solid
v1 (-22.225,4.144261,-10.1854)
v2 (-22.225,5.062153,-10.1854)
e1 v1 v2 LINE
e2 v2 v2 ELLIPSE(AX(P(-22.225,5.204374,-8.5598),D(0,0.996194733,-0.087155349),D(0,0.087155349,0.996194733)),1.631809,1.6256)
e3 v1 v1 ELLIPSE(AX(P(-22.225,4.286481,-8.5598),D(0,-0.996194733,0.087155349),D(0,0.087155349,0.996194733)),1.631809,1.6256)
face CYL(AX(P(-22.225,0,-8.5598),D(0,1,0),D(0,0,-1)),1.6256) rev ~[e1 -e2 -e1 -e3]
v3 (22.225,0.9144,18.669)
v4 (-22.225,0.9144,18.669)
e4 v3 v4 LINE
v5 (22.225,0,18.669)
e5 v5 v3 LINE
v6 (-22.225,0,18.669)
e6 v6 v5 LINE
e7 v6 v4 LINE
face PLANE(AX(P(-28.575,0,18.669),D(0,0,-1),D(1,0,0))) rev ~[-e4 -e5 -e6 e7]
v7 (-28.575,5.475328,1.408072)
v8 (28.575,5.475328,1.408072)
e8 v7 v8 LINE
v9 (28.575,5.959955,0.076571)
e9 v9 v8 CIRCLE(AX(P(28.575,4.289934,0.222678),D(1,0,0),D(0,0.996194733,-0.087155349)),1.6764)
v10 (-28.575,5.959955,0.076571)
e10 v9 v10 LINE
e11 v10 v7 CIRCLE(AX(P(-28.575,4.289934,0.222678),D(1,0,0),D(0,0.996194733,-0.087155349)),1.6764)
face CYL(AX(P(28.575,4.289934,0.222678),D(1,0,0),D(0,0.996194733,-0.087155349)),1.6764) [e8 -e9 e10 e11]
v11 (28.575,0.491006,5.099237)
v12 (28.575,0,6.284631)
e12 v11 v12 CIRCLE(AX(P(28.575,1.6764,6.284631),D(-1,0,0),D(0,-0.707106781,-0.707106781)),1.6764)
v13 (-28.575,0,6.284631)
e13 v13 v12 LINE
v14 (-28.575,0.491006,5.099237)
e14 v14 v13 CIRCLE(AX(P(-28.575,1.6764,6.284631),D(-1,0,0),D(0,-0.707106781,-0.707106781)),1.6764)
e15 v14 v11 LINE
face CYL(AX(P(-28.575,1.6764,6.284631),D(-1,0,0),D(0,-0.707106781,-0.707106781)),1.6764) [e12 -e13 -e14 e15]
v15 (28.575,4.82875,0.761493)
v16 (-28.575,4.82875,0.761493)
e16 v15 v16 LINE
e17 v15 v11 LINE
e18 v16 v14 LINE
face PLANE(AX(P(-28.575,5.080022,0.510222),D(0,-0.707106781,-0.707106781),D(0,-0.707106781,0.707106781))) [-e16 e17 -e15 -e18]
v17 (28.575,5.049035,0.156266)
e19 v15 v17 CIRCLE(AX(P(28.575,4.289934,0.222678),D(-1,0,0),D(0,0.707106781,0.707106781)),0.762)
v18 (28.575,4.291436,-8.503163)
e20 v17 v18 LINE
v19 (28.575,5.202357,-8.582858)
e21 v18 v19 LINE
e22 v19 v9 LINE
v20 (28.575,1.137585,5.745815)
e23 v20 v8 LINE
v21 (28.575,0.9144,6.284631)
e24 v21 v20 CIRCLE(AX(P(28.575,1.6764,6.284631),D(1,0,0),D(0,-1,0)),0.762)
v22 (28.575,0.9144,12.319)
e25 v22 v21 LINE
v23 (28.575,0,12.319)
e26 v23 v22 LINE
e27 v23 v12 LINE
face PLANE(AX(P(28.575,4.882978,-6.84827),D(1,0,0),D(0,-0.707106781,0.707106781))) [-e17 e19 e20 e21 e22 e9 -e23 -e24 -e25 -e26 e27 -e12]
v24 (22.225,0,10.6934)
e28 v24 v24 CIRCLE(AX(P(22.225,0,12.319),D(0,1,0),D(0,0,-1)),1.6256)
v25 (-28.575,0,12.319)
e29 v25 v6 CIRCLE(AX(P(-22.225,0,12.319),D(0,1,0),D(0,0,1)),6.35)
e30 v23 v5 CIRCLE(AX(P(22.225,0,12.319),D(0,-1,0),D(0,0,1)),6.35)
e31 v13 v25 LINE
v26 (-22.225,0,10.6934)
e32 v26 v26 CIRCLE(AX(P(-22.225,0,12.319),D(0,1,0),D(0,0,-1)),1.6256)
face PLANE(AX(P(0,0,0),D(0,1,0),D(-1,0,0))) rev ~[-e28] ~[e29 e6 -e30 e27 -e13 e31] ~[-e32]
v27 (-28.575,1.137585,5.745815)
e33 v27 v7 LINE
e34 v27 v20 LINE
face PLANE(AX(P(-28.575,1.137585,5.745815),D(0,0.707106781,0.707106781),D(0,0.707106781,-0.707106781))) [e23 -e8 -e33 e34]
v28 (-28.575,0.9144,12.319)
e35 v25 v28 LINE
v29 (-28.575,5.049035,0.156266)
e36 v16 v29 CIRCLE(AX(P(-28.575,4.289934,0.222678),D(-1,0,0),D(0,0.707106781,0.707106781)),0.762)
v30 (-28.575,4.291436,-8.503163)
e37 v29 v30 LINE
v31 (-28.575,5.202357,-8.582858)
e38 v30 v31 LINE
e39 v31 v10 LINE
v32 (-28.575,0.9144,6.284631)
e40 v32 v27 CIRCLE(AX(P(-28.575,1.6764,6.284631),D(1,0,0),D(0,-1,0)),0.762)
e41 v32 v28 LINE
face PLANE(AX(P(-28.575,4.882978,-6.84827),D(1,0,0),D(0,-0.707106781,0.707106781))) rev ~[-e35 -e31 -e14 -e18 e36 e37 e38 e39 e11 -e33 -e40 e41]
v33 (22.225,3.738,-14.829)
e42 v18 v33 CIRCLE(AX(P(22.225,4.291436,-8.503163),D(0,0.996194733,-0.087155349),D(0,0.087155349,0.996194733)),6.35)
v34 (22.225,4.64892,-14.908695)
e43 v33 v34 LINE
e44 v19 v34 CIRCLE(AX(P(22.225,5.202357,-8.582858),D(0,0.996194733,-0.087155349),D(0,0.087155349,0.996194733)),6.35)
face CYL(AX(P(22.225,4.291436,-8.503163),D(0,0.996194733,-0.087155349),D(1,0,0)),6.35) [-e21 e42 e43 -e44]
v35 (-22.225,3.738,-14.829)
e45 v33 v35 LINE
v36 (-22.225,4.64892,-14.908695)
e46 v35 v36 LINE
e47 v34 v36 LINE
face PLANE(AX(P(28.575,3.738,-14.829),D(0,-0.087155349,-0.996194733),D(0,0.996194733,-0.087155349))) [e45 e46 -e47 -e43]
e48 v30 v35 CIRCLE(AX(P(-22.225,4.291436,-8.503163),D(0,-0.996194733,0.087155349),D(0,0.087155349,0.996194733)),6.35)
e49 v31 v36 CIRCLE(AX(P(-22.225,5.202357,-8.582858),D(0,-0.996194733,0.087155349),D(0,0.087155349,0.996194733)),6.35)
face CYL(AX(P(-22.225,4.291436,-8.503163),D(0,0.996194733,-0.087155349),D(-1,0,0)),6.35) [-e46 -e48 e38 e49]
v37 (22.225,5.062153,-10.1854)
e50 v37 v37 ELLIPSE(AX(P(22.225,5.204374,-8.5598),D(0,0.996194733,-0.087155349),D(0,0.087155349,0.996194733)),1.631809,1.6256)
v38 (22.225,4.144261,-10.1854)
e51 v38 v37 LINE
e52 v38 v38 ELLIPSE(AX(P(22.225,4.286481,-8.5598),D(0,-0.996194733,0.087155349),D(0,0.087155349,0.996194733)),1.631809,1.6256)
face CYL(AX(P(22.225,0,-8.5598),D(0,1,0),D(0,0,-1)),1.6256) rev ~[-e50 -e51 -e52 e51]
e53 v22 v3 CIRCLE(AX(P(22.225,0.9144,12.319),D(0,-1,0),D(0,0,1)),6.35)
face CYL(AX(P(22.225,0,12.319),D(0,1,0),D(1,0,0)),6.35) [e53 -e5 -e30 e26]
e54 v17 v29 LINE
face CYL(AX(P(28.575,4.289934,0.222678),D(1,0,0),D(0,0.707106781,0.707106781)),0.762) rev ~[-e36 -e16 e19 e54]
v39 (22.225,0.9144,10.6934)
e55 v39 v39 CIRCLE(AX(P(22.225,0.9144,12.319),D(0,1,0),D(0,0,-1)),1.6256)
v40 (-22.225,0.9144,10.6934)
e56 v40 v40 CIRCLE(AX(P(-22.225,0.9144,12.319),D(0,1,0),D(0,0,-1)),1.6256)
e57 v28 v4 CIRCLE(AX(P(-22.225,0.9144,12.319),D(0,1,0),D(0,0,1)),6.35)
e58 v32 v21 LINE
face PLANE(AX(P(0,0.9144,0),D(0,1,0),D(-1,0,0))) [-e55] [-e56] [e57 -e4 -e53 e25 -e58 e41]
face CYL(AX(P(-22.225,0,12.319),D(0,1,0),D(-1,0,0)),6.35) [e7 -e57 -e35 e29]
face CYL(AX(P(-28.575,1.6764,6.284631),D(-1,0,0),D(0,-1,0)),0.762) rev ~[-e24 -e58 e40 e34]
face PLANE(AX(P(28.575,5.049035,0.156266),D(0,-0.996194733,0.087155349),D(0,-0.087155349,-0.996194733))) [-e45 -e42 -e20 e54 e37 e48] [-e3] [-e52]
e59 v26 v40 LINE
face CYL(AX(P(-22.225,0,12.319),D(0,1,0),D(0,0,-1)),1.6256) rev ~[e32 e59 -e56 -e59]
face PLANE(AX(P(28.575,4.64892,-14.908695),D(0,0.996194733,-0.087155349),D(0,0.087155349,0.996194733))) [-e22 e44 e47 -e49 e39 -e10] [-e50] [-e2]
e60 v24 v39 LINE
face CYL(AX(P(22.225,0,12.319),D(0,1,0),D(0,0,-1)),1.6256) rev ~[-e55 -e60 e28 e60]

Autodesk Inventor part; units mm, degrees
ref_plane "YZ Plane" through (0, 0, 0) normal (1, 0, 0) x (0, 1, 0)
ref_plane "XZ Plane" through (0, 0, 0) normal (0, 1, 0) x (-1, 0, 0)
ref_plane "XY Plane" through (0, 0, 0) normal (0, 0, 1) x (1, 0, 0)
sketch "Sketch4" plane through (0, 0, 0) normal (0, 1, 0) x (1, 0, 0)
  line L0 (22.225, -12.319) -> (-22.225, -12.319) construction
  line L1 (0, 12.7356) -> (0, -16.4948) construction
  point P0 (0, 0)
  point P1 (22.225, 8.5598)
  point P2 (-22.225, 8.5598)
  dimension "d23" = 44.45
  dimension "d25" = 20.8788
  dimension "d26" = 12.319
sketch "Sketch1" plane through (0, 0, 0) normal (0, 1, 0) x (-1, 0, 0)
  line L0 (28.575, 18.669) -> (-28.575, 18.669)
  line L1 (-28.575, 18.669) -> (-28.575, 5.969)
  line L2 (-28.575, 5.969) -> (28.575, 5.969)
  line L3 (28.575, 5.969) -> (28.575, 18.669)
  line L4 (28.575, 18.669) -> (-28.575, 5.969) construction
  line L5 (-28.575, 18.669) -> (28.575, 5.969) construction
  line L6 (0, 3.429) -> (0, 21.209)
  point P0 (0, 12.319)
  point P1 (-22.225, 12.319)
  point P2 (0, 12.319)
  point P3 (0, 12.319)
  dimension "d27" = 6.35
  dimension "d28" = 6.35
  dimension "d29" = 6.35
extrude "Plate1" add sketch "Sketch1" along normal blind 0.9144
sketch "Sketch2" plane through (-28.575, 0.9144, 5.969) normal (0, -0.7071068, -0.7071068) x (1, 0, 0)
  line L0 (57.15, 0) -> (0, 0)
  line L1 (0, 0) -> (0, -6.8054)
  line L2 (0, -6.8054) -> (57.15, -6.8054)
  line L3 (57.15, -6.8054) -> (57.15, 0)
edge flange "Flange1" height 5.08 angle 45 thickness 0.9144 bend radius 0.762 thickness toward (0, -0.7071068, -0.7071068) relief tear relief width 0.9144 relief depth 0.4572 edges at (0, 0.9144, 5.969) wall of the first edge with corners at (28.575, 0.9144, 5.969) (-28.575, 0.9144, 5.969) (-28.575, 5.7266, 1.1568) (28.575, 5.7266, 1.1568)
bend "Bend1"
corner "Corner1"
sketch "Sketch3" plane through (28.575, 5.08, 0.5102) normal (0, 0.9961947, -0.0871557) x (-1, 0, 0)
  line L0 (57.15, 0) -> (0, 0)
  line L1 (0, 0) -> (0, -15.3978)
  line L2 (0, -15.3978) -> (57.15, -15.3978)
  line L3 (57.15, -15.3978) -> (57.15, 0)
edge flange "Flange2" height 15.8242 angle 50 thickness 0.9144 bend radius 0.762 thickness toward (0, 0.9961947, -0.0871557) relief tear relief width 0.9144 relief depth 0.4572 edges at (0, 5.08, 0.5102) wall of the first edge with corners at (-28.575, 5.08, 0.5102) (28.575, 5.08, 0.5102) (28.575, 3.738, -14.829) (-28.575, 3.738, -14.829)
bend "Bend2"
corner "Corner2"
hole "Hole1" at (22.225, 0, 12.319) at (-22.225, 0, 12.319) at (22.225, 0, -8.5598) at (-22.225, 0, -8.5598) direction (0, 1, 0) diameter 3.2512 end through all
fillet "Corner Round1" radius 6.35 4 edges at (28.575, 4.1935, -14.8688) (-28.575, 4.1935, -14.8688) (-28.575, 0.4572, 18.669) (28.575, 0.4572, 18.669)
equation "\"d28\" = d27"
equation "\"d35\" = Thickness"
equation "\"d2\" = Thickness"
equation "\"d3\" = BendReliefWidth"
equation "\"d4\" = BendReliefDepth"
equation "\"d5\" = MinimumRemnant"
equation "\"d6\" = TransitionRadius"
equation "\"d9\" = BendRadius"
equation "\"d10\" = CornerReliefSize"
equation "\"d11\" = GapSize"
equation "\"d12\" = JacobiRadiusSize"
equation "\"d13\" = BendReliefWidth"
equation "\"d14\" = BendReliefDepth"
equation "\"d15\" = MinimumRemnant"
equation "\"d16\" = TransitionRadius"
equation "\"d19\" = BendRadius"
equation "\"d20\" = CornerReliefSize"
equation "\"d21\" = GapSize"
equation "\"d22\" = JacobiRadiusSize"
equation "\"BendReliefWidth\" = Thickness"
equation "\"BendReliefDepth\" = 0.5 * Thickness"
equation "\"CornerReliefSize\" = 4 * Thickness"
equation "\"MinimumRemnant\" = 2 * Thickness"
equation "\"TransitionRadius\" = BendRadius"
equation "\"JacobiRadiusSize\" = BendRadius"
equation "\"GapSize\" = Thickness"
equation "\"Thickness\" = 0.9144"
equation "\"BendRadius\" = 0.762"
properties part number "J009836" material "STAINLESS STEEL, 316"
